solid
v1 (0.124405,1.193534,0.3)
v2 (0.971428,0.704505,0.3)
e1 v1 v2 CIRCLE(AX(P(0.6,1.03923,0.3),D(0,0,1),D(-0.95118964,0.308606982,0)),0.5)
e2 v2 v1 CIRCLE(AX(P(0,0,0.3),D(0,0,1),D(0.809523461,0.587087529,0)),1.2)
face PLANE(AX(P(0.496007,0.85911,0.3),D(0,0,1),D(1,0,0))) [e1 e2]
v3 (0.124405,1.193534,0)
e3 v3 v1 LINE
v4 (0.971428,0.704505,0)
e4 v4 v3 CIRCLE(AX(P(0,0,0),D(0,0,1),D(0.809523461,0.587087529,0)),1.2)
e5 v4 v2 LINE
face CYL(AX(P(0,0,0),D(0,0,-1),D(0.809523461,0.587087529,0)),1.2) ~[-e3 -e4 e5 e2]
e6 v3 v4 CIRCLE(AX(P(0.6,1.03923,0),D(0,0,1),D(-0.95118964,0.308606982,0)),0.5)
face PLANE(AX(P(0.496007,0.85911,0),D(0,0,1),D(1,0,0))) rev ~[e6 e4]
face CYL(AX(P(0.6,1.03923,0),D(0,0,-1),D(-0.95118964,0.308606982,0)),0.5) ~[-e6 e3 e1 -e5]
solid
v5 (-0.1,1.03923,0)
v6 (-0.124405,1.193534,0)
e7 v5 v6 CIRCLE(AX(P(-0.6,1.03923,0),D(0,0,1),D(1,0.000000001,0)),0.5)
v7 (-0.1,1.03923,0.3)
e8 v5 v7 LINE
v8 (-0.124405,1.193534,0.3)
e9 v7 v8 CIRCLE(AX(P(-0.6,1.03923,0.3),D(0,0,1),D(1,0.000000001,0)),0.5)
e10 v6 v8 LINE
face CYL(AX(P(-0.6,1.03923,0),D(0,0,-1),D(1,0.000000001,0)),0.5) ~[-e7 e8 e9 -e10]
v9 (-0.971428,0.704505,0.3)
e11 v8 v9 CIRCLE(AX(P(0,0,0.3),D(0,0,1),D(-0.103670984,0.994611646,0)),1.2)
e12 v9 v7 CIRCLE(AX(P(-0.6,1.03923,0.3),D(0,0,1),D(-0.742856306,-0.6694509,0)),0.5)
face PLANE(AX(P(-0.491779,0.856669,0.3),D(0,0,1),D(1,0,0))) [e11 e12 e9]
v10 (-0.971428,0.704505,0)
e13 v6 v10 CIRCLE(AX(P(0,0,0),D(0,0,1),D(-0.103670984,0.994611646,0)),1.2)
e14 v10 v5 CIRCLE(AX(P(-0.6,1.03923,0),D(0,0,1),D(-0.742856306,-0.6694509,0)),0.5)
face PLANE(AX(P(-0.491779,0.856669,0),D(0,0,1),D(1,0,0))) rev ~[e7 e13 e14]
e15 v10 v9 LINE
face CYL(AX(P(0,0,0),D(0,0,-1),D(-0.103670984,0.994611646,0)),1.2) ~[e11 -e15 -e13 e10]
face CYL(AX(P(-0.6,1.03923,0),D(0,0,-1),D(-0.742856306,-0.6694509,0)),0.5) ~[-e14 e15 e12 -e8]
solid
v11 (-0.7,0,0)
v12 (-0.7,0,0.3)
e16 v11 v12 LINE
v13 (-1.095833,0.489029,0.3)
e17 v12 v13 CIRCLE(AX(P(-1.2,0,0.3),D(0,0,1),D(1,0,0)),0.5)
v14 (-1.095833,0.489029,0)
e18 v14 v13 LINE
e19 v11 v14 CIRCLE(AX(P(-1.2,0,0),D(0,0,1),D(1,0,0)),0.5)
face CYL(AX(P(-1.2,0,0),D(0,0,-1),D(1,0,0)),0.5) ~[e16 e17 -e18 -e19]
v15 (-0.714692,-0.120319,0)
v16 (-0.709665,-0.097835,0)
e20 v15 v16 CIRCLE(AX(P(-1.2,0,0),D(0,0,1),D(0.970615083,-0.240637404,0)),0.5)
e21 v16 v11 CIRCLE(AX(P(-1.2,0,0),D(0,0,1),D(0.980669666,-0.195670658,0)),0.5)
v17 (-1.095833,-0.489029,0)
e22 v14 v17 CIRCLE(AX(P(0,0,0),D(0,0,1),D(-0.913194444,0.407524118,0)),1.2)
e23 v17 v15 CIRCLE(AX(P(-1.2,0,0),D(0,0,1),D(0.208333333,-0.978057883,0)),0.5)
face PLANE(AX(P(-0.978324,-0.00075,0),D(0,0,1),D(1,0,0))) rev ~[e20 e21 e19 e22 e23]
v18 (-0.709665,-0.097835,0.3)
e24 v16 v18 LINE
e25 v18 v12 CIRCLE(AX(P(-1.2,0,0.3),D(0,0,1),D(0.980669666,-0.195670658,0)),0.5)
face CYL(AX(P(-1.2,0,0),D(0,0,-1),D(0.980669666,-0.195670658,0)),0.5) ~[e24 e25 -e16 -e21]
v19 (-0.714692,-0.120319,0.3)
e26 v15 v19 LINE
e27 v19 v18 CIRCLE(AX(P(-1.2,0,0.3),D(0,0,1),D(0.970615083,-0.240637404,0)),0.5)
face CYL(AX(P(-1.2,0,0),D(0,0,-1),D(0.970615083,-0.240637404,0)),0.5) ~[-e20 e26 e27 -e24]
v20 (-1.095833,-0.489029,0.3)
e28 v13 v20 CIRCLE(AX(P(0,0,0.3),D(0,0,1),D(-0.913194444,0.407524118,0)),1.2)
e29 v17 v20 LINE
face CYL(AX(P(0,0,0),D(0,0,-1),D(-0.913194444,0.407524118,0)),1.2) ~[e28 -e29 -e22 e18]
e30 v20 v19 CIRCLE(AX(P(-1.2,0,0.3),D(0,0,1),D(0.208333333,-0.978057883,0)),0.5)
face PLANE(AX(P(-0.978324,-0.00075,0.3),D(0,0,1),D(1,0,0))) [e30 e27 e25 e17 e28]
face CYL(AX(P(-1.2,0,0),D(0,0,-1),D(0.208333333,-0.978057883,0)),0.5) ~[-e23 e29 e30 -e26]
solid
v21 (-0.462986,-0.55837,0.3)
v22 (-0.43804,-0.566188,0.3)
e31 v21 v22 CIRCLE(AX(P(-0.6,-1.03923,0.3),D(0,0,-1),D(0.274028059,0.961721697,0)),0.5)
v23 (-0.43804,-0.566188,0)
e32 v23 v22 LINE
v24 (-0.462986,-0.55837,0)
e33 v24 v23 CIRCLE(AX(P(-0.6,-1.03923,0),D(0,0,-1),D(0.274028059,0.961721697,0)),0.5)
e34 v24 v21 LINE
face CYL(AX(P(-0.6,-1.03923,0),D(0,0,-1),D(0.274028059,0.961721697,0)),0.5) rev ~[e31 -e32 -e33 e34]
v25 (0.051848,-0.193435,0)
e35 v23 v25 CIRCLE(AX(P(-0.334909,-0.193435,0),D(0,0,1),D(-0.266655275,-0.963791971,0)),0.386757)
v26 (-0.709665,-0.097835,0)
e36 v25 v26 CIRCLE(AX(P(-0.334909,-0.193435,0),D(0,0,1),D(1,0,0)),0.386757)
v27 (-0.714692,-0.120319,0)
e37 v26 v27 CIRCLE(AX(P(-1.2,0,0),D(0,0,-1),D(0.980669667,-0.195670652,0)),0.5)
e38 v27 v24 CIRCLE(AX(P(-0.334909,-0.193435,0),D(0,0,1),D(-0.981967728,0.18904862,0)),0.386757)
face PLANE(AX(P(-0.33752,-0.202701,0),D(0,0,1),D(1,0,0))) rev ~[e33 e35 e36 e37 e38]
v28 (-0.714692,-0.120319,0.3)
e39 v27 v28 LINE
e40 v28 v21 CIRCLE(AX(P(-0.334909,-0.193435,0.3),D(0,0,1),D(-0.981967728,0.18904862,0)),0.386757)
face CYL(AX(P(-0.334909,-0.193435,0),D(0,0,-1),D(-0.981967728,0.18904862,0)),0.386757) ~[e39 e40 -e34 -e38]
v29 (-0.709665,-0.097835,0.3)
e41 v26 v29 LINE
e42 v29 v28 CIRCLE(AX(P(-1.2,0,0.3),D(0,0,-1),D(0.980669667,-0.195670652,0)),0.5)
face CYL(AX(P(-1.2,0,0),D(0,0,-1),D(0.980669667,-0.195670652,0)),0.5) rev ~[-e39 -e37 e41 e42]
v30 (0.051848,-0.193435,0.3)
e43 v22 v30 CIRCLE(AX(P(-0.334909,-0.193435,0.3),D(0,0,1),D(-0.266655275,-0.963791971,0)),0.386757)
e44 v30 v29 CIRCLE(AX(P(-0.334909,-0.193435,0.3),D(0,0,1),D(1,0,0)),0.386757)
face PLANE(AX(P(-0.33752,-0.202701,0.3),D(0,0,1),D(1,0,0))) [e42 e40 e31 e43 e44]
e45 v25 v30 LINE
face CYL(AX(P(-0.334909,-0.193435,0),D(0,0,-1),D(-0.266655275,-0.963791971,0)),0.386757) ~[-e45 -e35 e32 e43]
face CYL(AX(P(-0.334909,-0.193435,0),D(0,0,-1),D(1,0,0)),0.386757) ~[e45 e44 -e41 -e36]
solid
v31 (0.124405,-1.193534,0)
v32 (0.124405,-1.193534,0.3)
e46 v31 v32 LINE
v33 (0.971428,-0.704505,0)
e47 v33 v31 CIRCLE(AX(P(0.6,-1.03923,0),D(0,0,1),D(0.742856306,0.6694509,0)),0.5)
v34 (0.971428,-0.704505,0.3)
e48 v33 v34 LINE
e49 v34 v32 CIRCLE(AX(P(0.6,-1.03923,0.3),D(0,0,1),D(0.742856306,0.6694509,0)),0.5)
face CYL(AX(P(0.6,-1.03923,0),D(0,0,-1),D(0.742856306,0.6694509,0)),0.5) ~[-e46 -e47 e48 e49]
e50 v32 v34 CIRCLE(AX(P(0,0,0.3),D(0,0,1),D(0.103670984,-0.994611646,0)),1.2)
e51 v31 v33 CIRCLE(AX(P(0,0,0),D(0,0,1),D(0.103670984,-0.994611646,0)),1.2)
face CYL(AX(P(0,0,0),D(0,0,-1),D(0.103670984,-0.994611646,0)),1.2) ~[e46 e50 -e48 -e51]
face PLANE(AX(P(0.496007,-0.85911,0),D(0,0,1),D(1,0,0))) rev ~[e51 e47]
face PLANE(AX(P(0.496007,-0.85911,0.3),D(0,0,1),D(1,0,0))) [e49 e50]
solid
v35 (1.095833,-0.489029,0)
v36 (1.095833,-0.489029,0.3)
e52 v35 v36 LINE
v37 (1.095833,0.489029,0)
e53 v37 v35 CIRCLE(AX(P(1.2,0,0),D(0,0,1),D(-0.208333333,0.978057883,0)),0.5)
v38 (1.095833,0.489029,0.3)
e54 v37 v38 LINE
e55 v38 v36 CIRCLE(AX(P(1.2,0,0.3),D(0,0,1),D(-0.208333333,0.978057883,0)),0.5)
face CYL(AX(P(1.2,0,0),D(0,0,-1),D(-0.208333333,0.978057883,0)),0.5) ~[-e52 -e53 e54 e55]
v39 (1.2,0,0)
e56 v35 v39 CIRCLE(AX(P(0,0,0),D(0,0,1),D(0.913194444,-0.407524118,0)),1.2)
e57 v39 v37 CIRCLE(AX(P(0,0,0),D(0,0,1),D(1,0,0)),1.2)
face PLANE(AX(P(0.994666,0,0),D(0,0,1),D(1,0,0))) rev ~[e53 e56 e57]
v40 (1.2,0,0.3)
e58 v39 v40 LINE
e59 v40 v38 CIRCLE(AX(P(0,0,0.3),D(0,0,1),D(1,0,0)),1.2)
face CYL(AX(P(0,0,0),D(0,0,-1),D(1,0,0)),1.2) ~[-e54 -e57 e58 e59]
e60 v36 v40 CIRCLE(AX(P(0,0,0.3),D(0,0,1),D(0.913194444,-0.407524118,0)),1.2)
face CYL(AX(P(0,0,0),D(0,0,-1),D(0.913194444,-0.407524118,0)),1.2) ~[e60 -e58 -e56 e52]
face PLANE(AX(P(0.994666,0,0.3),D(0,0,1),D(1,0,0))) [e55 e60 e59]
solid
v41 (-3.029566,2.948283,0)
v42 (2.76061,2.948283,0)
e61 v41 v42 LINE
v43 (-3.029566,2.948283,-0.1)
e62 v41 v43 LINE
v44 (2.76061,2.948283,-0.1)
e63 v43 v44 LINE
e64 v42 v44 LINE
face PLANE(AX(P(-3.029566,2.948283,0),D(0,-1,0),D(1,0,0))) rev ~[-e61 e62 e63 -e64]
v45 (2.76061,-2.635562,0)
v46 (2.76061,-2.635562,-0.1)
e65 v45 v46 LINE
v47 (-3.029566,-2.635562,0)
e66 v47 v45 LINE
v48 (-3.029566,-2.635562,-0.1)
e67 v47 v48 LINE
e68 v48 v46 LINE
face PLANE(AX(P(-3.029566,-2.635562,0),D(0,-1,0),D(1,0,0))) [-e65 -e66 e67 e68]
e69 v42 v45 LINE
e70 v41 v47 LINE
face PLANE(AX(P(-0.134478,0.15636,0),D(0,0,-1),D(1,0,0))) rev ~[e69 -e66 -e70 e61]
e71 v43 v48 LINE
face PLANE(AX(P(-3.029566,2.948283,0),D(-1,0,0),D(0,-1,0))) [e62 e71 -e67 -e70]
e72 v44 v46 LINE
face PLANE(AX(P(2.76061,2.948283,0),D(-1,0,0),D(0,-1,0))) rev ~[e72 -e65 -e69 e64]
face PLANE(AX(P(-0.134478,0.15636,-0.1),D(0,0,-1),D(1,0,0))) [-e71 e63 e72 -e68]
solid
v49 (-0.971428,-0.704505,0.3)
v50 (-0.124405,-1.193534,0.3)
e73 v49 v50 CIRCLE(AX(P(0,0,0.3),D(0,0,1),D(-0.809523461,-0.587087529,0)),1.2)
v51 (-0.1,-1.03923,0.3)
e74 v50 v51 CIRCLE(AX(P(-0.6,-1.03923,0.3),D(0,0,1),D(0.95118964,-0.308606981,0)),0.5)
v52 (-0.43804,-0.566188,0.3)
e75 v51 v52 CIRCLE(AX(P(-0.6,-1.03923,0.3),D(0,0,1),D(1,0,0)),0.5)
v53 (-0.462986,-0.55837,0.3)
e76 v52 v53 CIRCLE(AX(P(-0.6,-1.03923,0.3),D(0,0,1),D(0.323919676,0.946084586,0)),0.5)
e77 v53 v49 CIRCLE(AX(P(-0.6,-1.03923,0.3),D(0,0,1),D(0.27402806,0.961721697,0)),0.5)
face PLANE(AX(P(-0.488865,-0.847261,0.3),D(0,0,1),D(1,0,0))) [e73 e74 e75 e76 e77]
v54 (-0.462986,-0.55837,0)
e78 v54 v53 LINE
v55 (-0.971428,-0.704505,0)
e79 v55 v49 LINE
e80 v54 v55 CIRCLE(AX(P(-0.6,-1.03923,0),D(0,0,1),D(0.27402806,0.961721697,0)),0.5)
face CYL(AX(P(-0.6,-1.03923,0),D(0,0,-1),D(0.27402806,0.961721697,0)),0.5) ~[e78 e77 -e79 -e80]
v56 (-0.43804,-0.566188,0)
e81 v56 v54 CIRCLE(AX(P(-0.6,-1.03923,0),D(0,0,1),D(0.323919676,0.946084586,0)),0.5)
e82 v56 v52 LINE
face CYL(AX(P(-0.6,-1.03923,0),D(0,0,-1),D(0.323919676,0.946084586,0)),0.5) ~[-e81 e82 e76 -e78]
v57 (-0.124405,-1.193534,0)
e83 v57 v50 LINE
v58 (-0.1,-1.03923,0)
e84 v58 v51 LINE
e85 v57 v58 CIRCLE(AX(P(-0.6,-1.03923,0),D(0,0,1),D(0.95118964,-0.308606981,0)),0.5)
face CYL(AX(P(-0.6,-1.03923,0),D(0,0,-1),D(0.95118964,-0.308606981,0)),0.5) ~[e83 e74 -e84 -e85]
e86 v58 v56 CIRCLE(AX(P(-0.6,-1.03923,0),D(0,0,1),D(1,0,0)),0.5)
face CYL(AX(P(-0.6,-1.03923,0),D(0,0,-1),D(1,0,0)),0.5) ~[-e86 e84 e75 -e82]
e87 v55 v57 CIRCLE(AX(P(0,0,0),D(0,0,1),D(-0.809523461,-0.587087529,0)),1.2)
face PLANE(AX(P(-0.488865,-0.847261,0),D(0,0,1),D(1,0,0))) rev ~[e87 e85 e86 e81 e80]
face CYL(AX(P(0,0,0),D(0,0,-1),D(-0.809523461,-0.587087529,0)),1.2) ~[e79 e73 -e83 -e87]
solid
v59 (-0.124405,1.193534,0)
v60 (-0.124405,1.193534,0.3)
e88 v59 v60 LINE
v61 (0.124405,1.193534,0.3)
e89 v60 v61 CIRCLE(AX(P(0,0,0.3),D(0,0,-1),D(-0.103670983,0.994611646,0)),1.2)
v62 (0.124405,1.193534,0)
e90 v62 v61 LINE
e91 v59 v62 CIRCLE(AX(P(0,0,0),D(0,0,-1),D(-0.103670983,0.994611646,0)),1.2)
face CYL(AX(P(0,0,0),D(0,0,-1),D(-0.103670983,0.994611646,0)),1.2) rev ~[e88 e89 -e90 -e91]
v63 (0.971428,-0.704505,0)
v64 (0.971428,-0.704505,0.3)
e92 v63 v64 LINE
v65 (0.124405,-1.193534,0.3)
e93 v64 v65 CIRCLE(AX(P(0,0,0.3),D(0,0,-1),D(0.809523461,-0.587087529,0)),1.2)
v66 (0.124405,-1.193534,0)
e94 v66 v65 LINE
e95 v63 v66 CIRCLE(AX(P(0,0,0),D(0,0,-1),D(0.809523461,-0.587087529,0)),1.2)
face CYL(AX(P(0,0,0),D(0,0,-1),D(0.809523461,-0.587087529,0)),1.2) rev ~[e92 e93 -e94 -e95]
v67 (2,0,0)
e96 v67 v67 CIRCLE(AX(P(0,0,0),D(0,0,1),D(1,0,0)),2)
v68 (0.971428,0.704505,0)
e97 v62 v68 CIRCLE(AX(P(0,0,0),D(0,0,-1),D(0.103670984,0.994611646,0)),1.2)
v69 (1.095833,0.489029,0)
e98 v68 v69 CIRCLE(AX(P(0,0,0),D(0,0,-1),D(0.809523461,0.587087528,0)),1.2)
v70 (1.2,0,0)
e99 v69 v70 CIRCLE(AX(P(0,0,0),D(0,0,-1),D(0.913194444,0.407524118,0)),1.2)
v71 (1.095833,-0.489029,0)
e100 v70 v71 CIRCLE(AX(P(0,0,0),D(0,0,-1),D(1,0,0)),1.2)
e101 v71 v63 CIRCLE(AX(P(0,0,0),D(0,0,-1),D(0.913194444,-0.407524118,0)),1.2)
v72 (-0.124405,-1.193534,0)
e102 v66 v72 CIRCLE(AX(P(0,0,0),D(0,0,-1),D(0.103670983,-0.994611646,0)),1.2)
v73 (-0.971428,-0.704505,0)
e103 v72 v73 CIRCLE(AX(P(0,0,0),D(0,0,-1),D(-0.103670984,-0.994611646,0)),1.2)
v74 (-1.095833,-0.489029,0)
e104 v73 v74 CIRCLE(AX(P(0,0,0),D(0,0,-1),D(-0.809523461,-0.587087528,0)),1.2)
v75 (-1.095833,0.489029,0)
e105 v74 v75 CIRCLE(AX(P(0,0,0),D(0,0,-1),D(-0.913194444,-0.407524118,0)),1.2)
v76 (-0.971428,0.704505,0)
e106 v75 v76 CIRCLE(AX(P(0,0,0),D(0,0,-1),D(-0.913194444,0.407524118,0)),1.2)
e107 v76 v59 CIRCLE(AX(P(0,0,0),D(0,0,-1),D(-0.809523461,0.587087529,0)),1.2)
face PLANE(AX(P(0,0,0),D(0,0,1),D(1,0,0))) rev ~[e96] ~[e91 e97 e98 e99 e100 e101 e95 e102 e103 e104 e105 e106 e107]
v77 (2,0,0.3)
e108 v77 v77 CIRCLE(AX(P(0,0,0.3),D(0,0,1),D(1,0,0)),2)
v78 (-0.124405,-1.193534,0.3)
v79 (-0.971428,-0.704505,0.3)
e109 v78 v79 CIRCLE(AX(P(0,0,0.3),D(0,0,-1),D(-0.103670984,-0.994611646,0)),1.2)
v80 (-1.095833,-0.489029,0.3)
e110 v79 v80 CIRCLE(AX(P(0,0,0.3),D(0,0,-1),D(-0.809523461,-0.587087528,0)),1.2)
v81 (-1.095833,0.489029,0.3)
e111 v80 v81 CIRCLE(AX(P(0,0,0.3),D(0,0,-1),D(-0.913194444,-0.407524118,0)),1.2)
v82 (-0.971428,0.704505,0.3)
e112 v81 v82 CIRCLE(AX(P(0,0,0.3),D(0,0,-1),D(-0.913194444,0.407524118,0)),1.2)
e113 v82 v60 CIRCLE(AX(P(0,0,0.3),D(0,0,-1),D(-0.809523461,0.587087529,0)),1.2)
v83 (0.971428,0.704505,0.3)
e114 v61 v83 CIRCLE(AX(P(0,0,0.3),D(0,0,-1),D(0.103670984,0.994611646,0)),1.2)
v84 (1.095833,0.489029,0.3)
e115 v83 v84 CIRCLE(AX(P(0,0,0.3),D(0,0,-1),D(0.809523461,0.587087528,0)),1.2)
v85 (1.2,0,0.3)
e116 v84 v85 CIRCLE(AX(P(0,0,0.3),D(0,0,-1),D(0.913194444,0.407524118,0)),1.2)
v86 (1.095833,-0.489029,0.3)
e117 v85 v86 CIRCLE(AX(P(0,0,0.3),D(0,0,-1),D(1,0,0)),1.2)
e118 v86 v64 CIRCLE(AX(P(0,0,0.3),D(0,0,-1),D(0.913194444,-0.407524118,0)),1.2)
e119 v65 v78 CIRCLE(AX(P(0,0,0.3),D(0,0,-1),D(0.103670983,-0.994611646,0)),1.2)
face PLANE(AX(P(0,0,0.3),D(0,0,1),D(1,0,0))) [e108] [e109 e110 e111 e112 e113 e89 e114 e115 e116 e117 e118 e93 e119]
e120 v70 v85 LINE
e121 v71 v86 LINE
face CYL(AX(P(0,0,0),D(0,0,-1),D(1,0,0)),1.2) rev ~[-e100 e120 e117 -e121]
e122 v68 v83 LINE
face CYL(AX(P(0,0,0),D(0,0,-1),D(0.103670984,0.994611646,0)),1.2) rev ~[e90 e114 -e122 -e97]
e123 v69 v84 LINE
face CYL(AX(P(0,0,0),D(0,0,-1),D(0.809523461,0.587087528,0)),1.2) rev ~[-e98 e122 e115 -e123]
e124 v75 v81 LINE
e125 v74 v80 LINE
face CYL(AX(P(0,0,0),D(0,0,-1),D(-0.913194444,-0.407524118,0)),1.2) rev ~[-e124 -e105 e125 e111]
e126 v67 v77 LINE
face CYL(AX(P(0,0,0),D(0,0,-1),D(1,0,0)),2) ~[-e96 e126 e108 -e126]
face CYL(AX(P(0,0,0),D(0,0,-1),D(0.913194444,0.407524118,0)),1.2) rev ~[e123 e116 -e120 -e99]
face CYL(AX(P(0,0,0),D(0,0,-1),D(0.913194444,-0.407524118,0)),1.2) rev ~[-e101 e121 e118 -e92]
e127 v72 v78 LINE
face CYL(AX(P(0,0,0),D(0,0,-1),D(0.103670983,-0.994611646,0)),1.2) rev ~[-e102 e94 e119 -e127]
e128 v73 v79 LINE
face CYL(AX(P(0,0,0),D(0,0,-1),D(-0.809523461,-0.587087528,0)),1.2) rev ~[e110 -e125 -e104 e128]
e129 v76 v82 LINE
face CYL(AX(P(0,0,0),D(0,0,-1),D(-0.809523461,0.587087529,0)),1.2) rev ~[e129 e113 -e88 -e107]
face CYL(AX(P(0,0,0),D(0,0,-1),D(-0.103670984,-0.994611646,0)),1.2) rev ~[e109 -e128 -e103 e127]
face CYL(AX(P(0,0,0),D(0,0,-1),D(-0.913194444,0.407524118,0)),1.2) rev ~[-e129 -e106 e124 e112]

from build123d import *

# Parameters (mm, degrees)
F1_DEPTH = 0.3
F0_R     = 2
F2_DEPTH = 0.3
F3_DEPTH = 0.3
F5_W     = 5.7901758701
F5_H     = 5.5838446133
F6_DEPTH = 0.1


# Not quite as in the source:
# - a feature of the source that left no trace in its solid (it failed there, or was rolled back) is left out


with BuildPart() as f1:
    # F0 (on Top) → F1 (new body)
    with BuildSketch(Plane.XY):
        with BuildLine():
            ThreePointArc((-0.7096651668, -0.0978353275), (-0.7024221585, -0.04915579), (-0.7, 0))
            ThreePointArc((-0.7, 0), (-0.8113592061, 0.3145764348), (-1.0958333333, 0.4890289414))
            ThreePointArc((-1.0958333333, 0.4890289414), (-1.2, 0), (-1.0958333333, -0.4890289414))
            ThreePointArc((-1.0958333333, -0.4890289414), (-0.8523553963, -0.3593650366), (-0.7146924586, -0.1203187029))
            ThreePointArc((-0.7146924586, -0.1203187029), (-0.7123462626, -0.1090395733), (-0.7096651668, -0.0978353275))
        make_face()
        with BuildLine():
            ThreePointArc((-0.7146924586, -0.1203187029), (-0.7120492993, -0.1091059745), (-0.7096651668, -0.0978353275))
            ThreePointArc((-0.7096651668, -0.0978353275), (-0.7123462626, -0.1090395733), (-0.7146924586, -0.1203187029))
        make_face()
    extrude(amount=F1_DEPTH)


with BuildPart() as f1b:
    # F0 (on Top) → F1, piece 2 (new body)
    with BuildSketch(Plane.XY):
        with BuildLine():
            ThreePointArc((-0.1244051802, 1.1935339757), (-0.6, 1.0392304845), (-0.9714281531, 0.7045050343))
            ThreePointArc((-0.9714281531, 0.7045050343), (-0.420715417, 0.5724789036), (-0.1, 1.0392304845))
            ThreePointArc((-0.1, 1.0392304845), (-0.1061389822, 1.1173412716), (-0.1244051802, 1.1935339757))
        make_face()
    extrude(amount=F1_DEPTH)


with BuildPart() as f1c:
    # F0 (on Top) → F1, piece 3 (new body)
    with BuildSketch(Plane.XY):
        with BuildLine():
            ThreePointArc((-0.46298597, -0.5583696361), (-0.7381172832, -0.5586853607), (-0.9714281531, -0.7045050343))
            ThreePointArc((-0.9714281531, -0.7045050343), (-0.6, -1.0392304845), (-0.1244051802, -1.1935339757))
            ThreePointArc((-0.1244051802, -1.1935339757), (-0.1061389822, -1.1173412716), (-0.1, -1.0392304845))
            ThreePointArc((-0.1, -1.0392304845), (-0.1931954282, -0.748524378), (-0.4380401615, -0.5661881918))
            ThreePointArc((-0.4380401615, -0.5661881918), (-0.4505791453, -0.5624897467), (-0.46298597, -0.5583696361))
        make_face()
        with BuildLine():
            ThreePointArc((-0.4380401615, -0.5661881918), (-0.4504619581, -0.5621158505), (-0.46298597, -0.5583696361))
            ThreePointArc((-0.46298597, -0.5583696361), (-0.4505791453, -0.5624897467), (-0.4380401615, -0.5661881918))
        make_face()
    extrude(amount=F1_DEPTH)


with BuildPart() as f1d:
    # F0 (on Top) → F1, piece 4 (new body)
    with BuildSketch(Plane.XY):
        with BuildLine():
            ThreePointArc((1.1, 1.0392304845), (0.678110787, 1.5330915024), (0.1244051802, 1.1935339757))
            ThreePointArc((0.1244051802, 1.1935339757), (0.6, 1.0392304845), (0.9714281531, 0.7045050343))
            ThreePointArc((0.9714281531, 0.7045050343), (1.0667515809, 0.8599459015), (1.1, 1.0392304845))
        make_face()
    extrude(amount=F1_DEPTH)



with BuildPart() as f1e:
    # F0 (on Top) → F1, piece 5 (new body)
    with BuildSketch(Plane.XY):
        with BuildLine():
            ThreePointArc((0.9714281531, -0.7045050343), (0.6, -1.0392304845), (0.1244051802, -1.1935339757))
            ThreePointArc((0.1244051802, -1.1935339757), (0.678110787, -1.5330915024), (1.1, -1.0392304845))
            ThreePointArc((1.1, -1.0392304845), (1.0667515809, -0.8599459015), (0.9714281531, -0.7045050343))
        make_face()
    extrude(amount=F1_DEPTH)


with BuildPart() as f1f:
    # F0 (on Top) → F1, piece 6 (new body)
    with BuildSketch(Plane.XY):
        with BuildLine():
            ThreePointArc((1.2, 0), (1.1736694594, 0.25), (1.0958333333, 0.4890289414))
            ThreePointArc((1.0958333333, 0.4890289414), (0.7, 0), (1.0958333333, -0.4890289414))
            ThreePointArc((1.0958333333, -0.4890289414), (1.1736694594, -0.25), (1.2, 0))
        make_face()
    extrude(amount=F1_DEPTH)


with BuildPart() as f1d_1:
    add(f1d.part)

    add(f1e.part)  # F2 merges F1e
    # F0 (on Top) → F2 (join)
    with BuildSketch(Plane.XY):
        Circle(F0_R)
        with BuildLine():
            ThreePointArc((-1.0958333333, -0.4890289414), (-1.7, 0), (-1.0958333333, 0.4890289414))
            ThreePointArc((-1.0958333333, 0.4890289414), (-1.0392304845, 0.6), (-0.9714281531, 0.7045050343))
            ThreePointArc((-0.9714281531, 0.7045050343), (-0.85, 1.4722431864), (-0.1244051802, 1.1935339757))
            ThreePointArc((-0.1244051802, 1.1935339757), (0, 1.2), (0.1244051802, 1.1935339757))
            ThreePointArc((0.1244051802, 1.1935339757), (0.678110787, 1.5330915024), (1.1, 1.0392304845))
            ThreePointArc((1.1, 1.0392304845), (1.0667515809, 0.8599459015), (0.9714281531, 0.7045050343))
            ThreePointArc((0.9714281531, 0.7045050343), (1.0392304845, 0.6), (1.0958333333, 0.4890289414))
            ThreePointArc((1.0958333333, 0.4890289414), (1.5145764348, 0.3886407939), (1.7, 0))
            ThreePointArc((1.7, 0), (1.5145764348, -0.3886407939), (1.0958333333, -0.4890289414))
            ThreePointArc((1.0958333333, -0.4890289414), (1.0392304845, -0.6), (0.9714281531, -0.7045050343))
            ThreePointArc((0.9714281531, -0.7045050343), (1.0667515809, -0.8599459015), (1.1, -1.0392304845))
            ThreePointArc((1.1, -1.0392304845), (0.678110787, -1.5330915024), (0.1244051802, -1.1935339757))
            ThreePointArc((0.1244051802, -1.1935339757), (0, -1.2), (-0.1244051802, -1.1935339757))
            ThreePointArc((-0.1244051802, -1.1935339757), (-0.85, -1.4722431864), (-0.9714281531, -0.7045050343))
            ThreePointArc((-0.9714281531, -0.7045050343), (-1.0392304845, -0.6), (-1.0958333333, -0.4890289414))
        make_face(mode=Mode.SUBTRACT)
        with BuildLine():
            ThreePointArc((-1.0958333333, -0.4890289414), (-1.2, 0), (-1.0958333333, 0.4890289414))
            ThreePointArc((-1.0958333333, 0.4890289414), (-1.7, 0), (-1.0958333333, -0.4890289414))
        make_face()
        with BuildLine():
            ThreePointArc((-0.1244051802, -1.1935339757), (-0.6, -1.0392304845), (-0.9714281531, -0.7045050343))
            ThreePointArc((-0.9714281531, -0.7045050343), (-0.85, -1.4722431864), (-0.1244051802, -1.1935339757))
        make_face()
        with BuildLine():
            ThreePointArc((1.7, 0), (1.5145764348, 0.3886407939), (1.0958333333, 0.4890289414))
            ThreePointArc((1.0958333333, 0.4890289414), (1.1736694594, 0.25), (1.2, 0))
            ThreePointArc((1.2, 0), (1.1736694594, -0.25), (1.0958333333, -0.4890289414))
            ThreePointArc((1.0958333333, -0.4890289414), (1.5145764348, -0.3886407939), (1.7, 0))
        make_face()
        with BuildLine():
            ThreePointArc((-0.1244051802, 1.1935339757), (-0.85, 1.4722431864), (-0.9714281531, 0.7045050343))
            ThreePointArc((-0.9714281531, 0.7045050343), (-0.6, 1.0392304845), (-0.1244051802, 1.1935339757))
        make_face()
    extrude(amount=F2_DEPTH)


with BuildPart() as f2:
    # F0 (on Top) → F2, piece 2 (new body)
    with BuildSketch(Plane.XY):
        with BuildLine():
            ThreePointArc((0.9714281531, -0.7045050343), (0.35, -0.6062177826), (0.1244051802, -1.1935339757))
            ThreePointArc((0.1244051802, -1.1935339757), (0.6, -1.0392304845), (0.9714281531, -0.7045050343))
        make_face()
    extrude(amount=F2_DEPTH)


with BuildPart() as f2b:
    # F0 (on Top) → F2, piece 3 (new body)
    with BuildSketch(Plane.XY):
        with BuildLine():
            ThreePointArc((0.9714281531, 0.7045050343), (0.6, 1.0392304845), (0.1244051802, 1.1935339757))
            ThreePointArc((0.1244051802, 1.1935339757), (0.35, 0.6062177826), (0.9714281531, 0.7045050343))
        make_face()
    extrude(amount=F2_DEPTH)


with BuildPart() as f3:
    # F0 (on Top) → F3 (new body)
    with BuildSketch(Plane.XY):
        with BuildLine():
            ThreePointArc((0.0518479844, -0.1934346327), (-0.2867344533, 0.1903105649), (-0.7096651668, -0.0978353275))
            ThreePointArc((-0.7096651668, -0.0978353275), (-0.7120492993, -0.1091059745), (-0.7146924586, -0.1203187029))
            ThreePointArc((-0.7146924586, -0.1203187029), (-0.6702487628, -0.3861225462), (-0.46298597, -0.5583696361))
            ThreePointArc((-0.46298597, -0.5583696361), (-0.4504619581, -0.5621158505), (-0.4380401615, -0.5661881918))
            ThreePointArc((-0.4380401615, -0.5661881918), (-0.1007143125, -0.5012233635), (0.0518479844, -0.1934346327))
        make_face()
    extrude(amount=F3_DEPTH)


with BuildPart() as f6:
    # F5 (on face) → F6 (new body)
    with BuildSketch(Plane(origin=(0, 0, 0), x_dir=(1, 0, 0), z_dir=(0, 0, -1))):
        with Locations((-0.1344780903, -0.1563602127)):
            Rectangle(F5_W, F5_H)
    extrude(amount=F6_DEPTH)


solid = Compound([f1.part, f1b.part, f1c.part, f1f.part, f1d_1.part, f2.part, f2b.part, f3.part, f6.part])
